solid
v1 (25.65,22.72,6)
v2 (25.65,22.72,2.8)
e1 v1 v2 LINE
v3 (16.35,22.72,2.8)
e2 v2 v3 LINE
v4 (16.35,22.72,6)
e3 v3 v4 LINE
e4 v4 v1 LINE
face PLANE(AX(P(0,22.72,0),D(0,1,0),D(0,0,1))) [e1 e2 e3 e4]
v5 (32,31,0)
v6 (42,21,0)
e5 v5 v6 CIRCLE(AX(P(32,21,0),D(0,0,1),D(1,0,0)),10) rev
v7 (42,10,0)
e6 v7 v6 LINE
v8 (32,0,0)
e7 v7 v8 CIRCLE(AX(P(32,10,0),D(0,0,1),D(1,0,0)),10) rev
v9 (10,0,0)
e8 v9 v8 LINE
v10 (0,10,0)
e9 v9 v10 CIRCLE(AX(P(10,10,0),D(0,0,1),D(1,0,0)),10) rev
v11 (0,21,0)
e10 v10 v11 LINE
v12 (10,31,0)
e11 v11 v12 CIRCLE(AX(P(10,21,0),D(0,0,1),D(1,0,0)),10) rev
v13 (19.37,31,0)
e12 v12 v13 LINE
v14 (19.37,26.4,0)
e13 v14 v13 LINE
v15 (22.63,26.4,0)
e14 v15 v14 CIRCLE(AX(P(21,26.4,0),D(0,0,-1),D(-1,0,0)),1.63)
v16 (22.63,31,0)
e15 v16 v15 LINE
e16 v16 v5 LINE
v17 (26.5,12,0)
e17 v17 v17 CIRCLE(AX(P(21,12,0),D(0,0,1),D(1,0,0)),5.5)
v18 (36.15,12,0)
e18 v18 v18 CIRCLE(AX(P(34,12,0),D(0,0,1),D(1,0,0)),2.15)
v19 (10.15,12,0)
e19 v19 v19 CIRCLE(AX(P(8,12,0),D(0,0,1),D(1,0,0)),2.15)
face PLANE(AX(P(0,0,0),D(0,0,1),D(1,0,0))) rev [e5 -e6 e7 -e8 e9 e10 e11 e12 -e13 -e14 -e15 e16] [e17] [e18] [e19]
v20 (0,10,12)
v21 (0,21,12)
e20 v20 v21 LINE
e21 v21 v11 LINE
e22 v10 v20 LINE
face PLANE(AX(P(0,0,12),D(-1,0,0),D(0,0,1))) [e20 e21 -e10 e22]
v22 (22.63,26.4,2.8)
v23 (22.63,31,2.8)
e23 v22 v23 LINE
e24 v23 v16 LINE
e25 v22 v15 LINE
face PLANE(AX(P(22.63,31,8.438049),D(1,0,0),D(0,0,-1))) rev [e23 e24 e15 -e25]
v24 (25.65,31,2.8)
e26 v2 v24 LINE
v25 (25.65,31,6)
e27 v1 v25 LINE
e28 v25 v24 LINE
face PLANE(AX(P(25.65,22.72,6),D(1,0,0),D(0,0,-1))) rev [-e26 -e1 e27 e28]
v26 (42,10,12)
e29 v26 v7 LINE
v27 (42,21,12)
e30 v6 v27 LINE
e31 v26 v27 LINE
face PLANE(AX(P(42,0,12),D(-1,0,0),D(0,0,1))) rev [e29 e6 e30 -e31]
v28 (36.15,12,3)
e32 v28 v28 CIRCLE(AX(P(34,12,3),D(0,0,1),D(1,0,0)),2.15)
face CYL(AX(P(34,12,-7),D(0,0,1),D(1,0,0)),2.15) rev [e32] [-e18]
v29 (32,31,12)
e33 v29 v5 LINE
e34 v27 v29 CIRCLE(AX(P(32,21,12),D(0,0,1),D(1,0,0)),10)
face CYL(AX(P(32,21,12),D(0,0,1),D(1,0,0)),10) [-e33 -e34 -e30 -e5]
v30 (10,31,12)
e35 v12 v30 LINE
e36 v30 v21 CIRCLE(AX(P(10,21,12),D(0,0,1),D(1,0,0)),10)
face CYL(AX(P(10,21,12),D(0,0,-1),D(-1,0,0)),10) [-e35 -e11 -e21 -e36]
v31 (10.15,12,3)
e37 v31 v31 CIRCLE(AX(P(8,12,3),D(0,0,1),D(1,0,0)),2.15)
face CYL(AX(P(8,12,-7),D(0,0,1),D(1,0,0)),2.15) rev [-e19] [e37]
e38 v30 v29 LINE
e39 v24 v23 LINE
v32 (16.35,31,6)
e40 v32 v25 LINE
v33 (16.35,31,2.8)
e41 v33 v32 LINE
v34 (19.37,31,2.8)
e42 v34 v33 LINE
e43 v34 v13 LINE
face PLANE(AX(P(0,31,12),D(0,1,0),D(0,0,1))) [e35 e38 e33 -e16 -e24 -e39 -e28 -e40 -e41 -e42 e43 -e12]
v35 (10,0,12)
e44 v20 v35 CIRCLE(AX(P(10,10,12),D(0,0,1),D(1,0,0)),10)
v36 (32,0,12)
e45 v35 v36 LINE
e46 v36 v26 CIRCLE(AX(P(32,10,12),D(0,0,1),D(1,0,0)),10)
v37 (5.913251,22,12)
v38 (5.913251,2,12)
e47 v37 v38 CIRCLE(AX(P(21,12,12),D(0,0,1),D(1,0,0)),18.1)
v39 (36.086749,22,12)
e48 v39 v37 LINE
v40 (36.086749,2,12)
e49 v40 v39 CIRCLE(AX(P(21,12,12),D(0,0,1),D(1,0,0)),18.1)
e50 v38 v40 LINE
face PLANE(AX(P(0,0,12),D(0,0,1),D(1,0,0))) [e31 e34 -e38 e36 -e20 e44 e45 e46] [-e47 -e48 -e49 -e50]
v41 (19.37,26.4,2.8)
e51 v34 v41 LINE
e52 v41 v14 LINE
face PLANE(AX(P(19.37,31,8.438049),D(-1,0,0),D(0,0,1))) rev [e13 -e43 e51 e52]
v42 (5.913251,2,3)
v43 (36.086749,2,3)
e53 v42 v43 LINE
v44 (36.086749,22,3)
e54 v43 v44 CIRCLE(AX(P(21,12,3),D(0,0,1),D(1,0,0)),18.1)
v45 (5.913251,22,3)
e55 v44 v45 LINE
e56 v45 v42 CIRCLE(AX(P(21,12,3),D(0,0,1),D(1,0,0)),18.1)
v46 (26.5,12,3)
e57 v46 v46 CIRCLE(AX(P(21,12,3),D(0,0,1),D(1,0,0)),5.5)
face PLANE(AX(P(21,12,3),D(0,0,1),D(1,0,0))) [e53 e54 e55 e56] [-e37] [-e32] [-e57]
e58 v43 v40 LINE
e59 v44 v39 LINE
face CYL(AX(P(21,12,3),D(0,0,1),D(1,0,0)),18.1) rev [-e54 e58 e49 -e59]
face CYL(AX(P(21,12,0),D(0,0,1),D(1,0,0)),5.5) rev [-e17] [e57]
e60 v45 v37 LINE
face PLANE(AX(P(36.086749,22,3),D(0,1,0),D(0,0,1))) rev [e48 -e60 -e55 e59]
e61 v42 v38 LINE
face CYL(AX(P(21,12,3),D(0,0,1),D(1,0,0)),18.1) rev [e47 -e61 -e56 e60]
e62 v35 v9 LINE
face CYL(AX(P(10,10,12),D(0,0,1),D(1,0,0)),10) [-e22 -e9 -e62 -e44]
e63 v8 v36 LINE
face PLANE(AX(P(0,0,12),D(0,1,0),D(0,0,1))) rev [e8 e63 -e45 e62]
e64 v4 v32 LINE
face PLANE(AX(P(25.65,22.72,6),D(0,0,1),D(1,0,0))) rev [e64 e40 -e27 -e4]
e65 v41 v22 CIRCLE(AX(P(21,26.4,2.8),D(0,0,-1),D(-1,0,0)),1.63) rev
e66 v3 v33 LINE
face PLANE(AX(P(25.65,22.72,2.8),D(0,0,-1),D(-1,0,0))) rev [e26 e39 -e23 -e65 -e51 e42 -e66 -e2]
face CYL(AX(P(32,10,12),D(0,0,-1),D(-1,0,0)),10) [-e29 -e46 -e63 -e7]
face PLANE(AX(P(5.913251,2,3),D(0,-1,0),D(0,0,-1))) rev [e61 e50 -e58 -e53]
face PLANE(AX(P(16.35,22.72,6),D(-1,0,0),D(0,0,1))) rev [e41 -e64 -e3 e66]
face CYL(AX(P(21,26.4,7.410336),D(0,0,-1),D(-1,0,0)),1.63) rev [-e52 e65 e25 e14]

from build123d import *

# Parameters (mm, degrees)
SKETCH1_W               = 42
SKETCH1_H               = 31
BOSS_EXTRUDE1_DEPTH     = 12
CUT_EXTRUDE1_DEPTH      = 9
SKETCH4_R               = 2.15
CUT_EXTRUDE3_DEPTH      = 10
BOSS_EXTRUDE2_START     = -8.28
BOSS_EXTRUDE2_OUTLINE_W = 9.3
BOSS_EXTRUDE2_OUTLINE_H = 3.2
BOSS_EXTRUDE2_DEPTH     = 8.28
SKETCH6_R               = 1.63
CUT_EXTRUDE4_DEPTH      = 2.8
SKETCH7_W               = 3.26
SKETCH7_H               = 4.6
CUT_EXTRUDE5_DEPTH      = 2.8
FILLET1_R               = 10
SKETCH14_R              = 5.5
CUT_EXTRUDE7_DEPTH      = 53.971690553


# Read off the part's stored shape, not the designer's step: Boss-Extrude2
with BuildPart() as part:
    # Sketch1 → Boss-Extrude1 (new body)
    with BuildSketch(Plane.XY):
        with Locations((21, 15.5)):
            Rectangle(SKETCH1_W, SKETCH1_H)
    extrude(amount=BOSS_EXTRUDE1_DEPTH)

    # Sketch2 → Cut-Extrude1 (cut)
    with BuildSketch(Plane.XY.offset(12)):
        with BuildLine():
            Line((36.086749153, 22), (5.913250847, 22))
            ThreePointArc((5.913250847, 22), (2.9, 12), (5.913250847, 2))
            Line((5.913250847, 2), (36.086749153, 2))
            ThreePointArc((36.086749153, 2), (39.1, 12), (36.086749153, 22))
        make_face()
    extrude(amount=-CUT_EXTRUDE1_DEPTH, mode=Mode.SUBTRACT)

    # Sketch4 → Cut-Extrude3 (cut)
    with BuildSketch(Plane.XY.offset(3)):
        with Locations((8, 12)):
            Circle(SKETCH4_R)
        with Locations((34, 12)):
            Circle(SKETCH4_R)
    extrude(amount=-CUT_EXTRUDE3_DEPTH, mode=Mode.SUBTRACT)

    # Boss-Extrude2 outline → Boss-Extrude2 (cut)
    with BuildSketch(Plane(origin=(0, 31, 0), x_dir=(1, 0, 0), z_dir=(0, 1, 0)).offset(BOSS_EXTRUDE2_START)):
        with Locations((21, -4.4)):
            Rectangle(BOSS_EXTRUDE2_OUTLINE_W, BOSS_EXTRUDE2_OUTLINE_H)
    extrude(amount=BOSS_EXTRUDE2_DEPTH, mode=Mode.SUBTRACT)

    # Sketch6 → Cut-Extrude4 (cut)
    with BuildSketch(Plane(origin=(0, 0, 0), x_dir=(-1, 0, 0), z_dir=(0, 0, -1))):
        with Locations((-21, 26.4)):
            Circle(SKETCH6_R)
    extrude(amount=-CUT_EXTRUDE4_DEPTH, mode=Mode.SUBTRACT)

    # Sketch7 → Cut-Extrude5 (cut)
    with BuildSketch(Plane(origin=(0, 0, 0), x_dir=(-1, 0, 0), z_dir=(0, 0, -1))):
        with Locations((-21, 28.7)):
            Rectangle(SKETCH7_W, SKETCH7_H)
    extrude(amount=-CUT_EXTRUDE5_DEPTH, mode=Mode.SUBTRACT)

    # Fillet1
    fillet1_edges = [part.edges().sort_by_distance(p)[0] for p in [
        (0, 0, 6),
        (0, 31, 6),
        (42, 31, 6),
        (42, 0, 6),
    ]]
    fillet(fillet1_edges, radius=FILLET1_R)

    # Sketch14 → Cut-Extrude7 (cut, through all)
    with BuildSketch(Plane.XY.offset(3)):
        with Locations((21, 12)):
            Circle(SKETCH14_R)
    extrude(amount=-CUT_EXTRUDE7_DEPTH, mode=Mode.SUBTRACT)


solid = part.part
